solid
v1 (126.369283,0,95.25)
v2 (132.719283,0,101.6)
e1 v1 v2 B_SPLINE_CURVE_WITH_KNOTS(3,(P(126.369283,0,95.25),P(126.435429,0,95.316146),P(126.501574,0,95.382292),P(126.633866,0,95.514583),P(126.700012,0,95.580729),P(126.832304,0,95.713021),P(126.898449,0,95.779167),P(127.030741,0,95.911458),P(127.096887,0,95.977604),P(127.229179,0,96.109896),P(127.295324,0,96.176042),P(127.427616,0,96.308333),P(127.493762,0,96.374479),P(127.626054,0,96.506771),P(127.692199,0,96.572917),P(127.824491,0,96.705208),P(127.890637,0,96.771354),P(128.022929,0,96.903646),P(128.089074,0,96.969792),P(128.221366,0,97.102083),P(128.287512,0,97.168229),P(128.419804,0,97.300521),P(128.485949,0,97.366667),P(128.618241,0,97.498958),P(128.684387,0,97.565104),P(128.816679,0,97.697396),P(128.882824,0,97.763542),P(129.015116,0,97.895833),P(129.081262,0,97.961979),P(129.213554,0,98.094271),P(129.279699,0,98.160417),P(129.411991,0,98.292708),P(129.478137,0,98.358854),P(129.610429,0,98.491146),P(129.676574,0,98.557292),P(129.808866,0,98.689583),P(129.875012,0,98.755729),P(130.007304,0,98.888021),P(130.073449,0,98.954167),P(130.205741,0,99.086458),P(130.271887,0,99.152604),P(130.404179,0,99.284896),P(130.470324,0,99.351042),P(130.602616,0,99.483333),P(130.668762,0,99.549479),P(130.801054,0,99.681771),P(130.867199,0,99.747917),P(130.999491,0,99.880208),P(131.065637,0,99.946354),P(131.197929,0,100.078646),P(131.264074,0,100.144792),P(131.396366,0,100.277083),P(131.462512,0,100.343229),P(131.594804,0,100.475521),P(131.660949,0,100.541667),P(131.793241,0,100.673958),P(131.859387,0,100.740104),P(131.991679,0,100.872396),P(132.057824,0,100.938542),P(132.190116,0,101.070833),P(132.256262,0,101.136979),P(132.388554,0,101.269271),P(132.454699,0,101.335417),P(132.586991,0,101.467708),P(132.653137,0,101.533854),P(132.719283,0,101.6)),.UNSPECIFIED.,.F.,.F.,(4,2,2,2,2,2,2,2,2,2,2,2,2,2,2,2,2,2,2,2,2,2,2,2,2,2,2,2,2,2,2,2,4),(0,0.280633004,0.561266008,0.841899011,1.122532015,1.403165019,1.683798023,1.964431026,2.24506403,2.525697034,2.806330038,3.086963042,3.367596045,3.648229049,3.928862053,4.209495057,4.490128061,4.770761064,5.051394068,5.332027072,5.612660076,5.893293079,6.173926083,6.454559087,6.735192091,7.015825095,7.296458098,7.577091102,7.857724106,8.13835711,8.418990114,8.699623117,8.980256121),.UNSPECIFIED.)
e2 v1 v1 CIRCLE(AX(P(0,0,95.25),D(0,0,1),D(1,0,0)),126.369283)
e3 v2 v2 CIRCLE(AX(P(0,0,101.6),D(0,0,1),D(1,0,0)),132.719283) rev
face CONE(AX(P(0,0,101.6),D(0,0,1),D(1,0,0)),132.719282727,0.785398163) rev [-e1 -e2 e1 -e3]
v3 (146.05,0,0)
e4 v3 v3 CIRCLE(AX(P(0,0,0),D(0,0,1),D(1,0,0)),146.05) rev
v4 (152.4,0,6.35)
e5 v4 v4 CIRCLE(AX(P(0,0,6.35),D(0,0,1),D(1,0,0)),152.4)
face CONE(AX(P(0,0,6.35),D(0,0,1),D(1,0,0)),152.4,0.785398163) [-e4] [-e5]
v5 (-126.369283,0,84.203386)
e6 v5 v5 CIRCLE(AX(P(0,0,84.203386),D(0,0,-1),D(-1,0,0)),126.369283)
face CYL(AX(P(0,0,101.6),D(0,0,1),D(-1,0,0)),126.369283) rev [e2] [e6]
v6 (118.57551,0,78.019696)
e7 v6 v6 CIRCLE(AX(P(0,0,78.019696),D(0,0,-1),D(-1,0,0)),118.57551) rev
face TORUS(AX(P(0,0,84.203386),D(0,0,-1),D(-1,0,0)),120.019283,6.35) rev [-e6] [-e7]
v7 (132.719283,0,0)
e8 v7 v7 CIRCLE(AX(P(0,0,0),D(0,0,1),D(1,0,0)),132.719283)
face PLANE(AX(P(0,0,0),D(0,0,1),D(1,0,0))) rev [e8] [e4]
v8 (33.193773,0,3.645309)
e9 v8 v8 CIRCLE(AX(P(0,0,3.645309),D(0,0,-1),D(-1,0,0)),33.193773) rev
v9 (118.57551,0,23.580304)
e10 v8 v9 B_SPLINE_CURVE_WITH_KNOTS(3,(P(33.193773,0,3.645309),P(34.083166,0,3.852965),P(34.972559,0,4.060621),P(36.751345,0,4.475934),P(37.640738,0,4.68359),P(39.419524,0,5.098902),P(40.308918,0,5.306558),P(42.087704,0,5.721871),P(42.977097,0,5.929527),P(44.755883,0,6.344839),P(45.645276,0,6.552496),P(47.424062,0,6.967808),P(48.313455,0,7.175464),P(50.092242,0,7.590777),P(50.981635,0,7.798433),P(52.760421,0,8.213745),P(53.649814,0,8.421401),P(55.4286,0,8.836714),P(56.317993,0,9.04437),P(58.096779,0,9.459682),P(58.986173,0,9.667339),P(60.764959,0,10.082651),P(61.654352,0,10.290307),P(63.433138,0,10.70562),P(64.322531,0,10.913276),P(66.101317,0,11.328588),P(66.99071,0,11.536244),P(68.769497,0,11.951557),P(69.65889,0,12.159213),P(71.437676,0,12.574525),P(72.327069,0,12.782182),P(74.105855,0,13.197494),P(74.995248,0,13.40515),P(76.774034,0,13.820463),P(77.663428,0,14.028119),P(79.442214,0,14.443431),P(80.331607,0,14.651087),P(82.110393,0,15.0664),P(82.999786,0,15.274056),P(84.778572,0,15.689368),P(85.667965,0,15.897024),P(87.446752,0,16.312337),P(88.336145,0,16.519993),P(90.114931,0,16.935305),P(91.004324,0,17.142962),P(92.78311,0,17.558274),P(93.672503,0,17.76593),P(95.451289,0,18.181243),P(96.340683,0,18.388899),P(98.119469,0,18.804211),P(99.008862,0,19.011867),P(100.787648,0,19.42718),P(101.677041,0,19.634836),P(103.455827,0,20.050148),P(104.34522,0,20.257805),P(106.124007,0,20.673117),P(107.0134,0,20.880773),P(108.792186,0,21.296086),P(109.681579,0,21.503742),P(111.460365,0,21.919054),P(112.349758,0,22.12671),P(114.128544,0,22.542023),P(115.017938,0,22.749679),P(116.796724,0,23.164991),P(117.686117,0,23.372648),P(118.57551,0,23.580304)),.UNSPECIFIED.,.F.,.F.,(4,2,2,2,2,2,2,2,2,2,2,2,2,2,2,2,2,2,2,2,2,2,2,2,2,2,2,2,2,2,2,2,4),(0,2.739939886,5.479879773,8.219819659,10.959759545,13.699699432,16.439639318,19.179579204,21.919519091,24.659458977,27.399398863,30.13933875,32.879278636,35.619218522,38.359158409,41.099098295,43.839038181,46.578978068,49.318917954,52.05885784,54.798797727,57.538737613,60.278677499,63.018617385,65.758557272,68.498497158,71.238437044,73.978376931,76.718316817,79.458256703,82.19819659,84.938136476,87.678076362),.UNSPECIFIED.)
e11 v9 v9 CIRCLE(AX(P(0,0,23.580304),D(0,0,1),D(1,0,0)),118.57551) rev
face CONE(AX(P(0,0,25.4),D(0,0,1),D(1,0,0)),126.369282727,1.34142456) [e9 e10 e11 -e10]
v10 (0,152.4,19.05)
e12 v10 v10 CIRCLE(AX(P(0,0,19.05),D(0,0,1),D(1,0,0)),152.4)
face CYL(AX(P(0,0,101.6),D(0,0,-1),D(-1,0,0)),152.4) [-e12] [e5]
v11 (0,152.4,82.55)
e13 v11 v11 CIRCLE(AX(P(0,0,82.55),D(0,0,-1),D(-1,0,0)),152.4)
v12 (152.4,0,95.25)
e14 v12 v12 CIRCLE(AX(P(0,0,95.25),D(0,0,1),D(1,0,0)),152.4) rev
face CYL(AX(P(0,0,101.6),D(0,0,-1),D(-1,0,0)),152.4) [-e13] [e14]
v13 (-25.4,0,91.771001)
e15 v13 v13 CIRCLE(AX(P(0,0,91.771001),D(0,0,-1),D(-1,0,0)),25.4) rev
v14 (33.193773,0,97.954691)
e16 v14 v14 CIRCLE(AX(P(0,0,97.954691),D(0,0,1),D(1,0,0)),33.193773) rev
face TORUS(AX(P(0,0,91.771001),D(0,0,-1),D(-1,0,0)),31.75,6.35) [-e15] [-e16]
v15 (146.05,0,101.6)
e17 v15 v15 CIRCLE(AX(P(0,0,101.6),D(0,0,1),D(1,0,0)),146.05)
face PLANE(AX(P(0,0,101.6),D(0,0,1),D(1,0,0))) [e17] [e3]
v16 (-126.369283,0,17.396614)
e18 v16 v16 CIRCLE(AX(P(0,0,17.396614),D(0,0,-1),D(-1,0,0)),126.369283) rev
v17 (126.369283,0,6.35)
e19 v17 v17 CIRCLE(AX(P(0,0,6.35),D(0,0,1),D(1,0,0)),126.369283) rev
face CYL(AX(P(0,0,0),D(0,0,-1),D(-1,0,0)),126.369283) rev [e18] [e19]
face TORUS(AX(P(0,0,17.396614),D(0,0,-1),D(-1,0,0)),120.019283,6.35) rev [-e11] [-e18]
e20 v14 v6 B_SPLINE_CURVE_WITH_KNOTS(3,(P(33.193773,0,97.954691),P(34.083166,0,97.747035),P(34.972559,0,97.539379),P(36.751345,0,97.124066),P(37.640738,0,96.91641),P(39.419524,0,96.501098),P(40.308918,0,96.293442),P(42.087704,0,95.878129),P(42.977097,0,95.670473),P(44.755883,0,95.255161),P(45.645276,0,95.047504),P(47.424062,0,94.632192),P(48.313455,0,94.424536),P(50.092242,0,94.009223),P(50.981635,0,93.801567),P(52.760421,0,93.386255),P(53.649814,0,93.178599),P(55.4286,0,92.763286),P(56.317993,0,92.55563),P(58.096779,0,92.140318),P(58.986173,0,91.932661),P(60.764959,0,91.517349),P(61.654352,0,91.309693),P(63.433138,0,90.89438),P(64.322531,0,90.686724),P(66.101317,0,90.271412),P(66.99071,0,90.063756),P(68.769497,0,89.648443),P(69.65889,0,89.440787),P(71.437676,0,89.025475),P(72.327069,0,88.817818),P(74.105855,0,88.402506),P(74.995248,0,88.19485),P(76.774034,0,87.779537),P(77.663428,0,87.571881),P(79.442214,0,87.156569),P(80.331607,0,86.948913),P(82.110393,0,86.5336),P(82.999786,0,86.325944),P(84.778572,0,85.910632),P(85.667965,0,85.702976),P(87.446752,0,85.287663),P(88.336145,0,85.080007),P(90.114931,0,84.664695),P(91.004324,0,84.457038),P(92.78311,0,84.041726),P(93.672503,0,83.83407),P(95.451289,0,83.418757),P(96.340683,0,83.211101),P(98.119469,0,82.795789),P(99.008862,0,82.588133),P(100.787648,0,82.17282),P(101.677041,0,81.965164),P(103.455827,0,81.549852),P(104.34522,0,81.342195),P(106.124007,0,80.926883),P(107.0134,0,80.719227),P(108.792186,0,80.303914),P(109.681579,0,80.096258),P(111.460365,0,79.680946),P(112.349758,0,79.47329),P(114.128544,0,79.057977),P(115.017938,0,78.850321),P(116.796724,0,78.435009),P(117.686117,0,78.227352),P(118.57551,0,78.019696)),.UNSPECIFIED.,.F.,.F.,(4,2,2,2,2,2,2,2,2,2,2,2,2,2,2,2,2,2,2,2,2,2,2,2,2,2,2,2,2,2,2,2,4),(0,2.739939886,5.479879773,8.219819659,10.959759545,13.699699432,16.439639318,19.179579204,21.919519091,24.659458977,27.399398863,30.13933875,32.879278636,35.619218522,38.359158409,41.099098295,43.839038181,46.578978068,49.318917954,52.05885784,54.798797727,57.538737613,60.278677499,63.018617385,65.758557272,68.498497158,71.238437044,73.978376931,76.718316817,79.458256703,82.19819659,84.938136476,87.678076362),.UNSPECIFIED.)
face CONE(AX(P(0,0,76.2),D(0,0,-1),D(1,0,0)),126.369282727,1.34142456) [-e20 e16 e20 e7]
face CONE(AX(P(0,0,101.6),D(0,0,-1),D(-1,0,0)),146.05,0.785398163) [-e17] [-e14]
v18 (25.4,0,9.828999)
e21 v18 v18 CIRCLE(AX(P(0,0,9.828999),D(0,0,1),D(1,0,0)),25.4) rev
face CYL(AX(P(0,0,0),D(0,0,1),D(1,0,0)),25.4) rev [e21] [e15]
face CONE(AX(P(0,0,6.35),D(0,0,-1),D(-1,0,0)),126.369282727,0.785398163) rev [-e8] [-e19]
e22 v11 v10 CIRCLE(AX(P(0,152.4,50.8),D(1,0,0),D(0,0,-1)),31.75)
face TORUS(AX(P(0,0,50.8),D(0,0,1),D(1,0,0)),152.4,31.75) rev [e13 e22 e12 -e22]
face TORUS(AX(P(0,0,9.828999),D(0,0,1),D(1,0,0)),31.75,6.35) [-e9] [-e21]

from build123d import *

# Parameters (mm, degrees)
SKETCH1_R           = 152.4
BOSS_EXTRUDE1_DEPTH = 101.6
SKETCH2_R           = 31.75
SKETCH4_R           = 25.4
CUT_EXTRUDE1_DEPTH  = 239.273120599
CHAMFER1_SIZE       = 6.35
FILLET1_R           = 6.35
FILLET2_R           = 6.35
FILLET3_R           = 6.35


with BuildPart() as part:
    # Sketch1 → Boss-Extrude1 (new body)
    with BuildSketch(Plane.XY):
        Circle(SKETCH1_R)
    extrude(amount=BOSS_EXTRUDE1_DEPTH)

    # Cut-Sweep1: sweep along a path in Sketch3
    with BuildLine(Plane.XY.offset(50.8)) as cut_sweep1_path:
        CenterArc((0, 0), 152.4, 0, 360)
    # Sketch2 → Cut-Sweep1 (sweep, cut)
    with BuildSketch(Plane(origin=(0, 0, 0), x_dir=(0, 0, -1), z_dir=(1, 0, 0))):
        with Locations((-50.8, 152.4)):
            Circle(SKETCH2_R)
    sweep(path=cut_sweep1_path.line, mode=Mode.SUBTRACT)

    # Sketch4 → Cut-Extrude1 (cut, through all)
    with BuildSketch(Plane.XY.offset(101.6)):
        Circle(SKETCH4_R)
    extrude(amount=-CUT_EXTRUDE1_DEPTH, mode=Mode.SUBTRACT)

    # Sketch6 → Cut-Revolve5 (revolve, cut)
    with BuildSketch(Plane(origin=(0, 0, 0), x_dir=(0, 0, -1), z_dir=(1, 0, 0))):
        Polygon((-25.4, 126.369282727), (0, 126.369282727), (0, 17.580887087), align=None)
    cut_revolve5 = revolve(axis=Axis((0, 0, 0), (0, 0, 1)), mode=Mode.SUBTRACT)

    # Mirror1: Cut-Revolve5 across plane
    add(cut_revolve5.mirror(Plane.XY.offset(50.8)), mode=Mode.SUBTRACT)

    # Chamfer1
    chamfer1_edges = [part.edges().sort_by_distance(p)[0] for p in [
        (0, -126.369282727, 0),
        (-152.4, 0, 0),
        (0, -126.369282727, 101.6),
        (-152.4, 0, 101.6),
    ]]
    chamfer(chamfer1_edges, length=CHAMFER1_SIZE)

    # Fillet1
    fillet1_edges = [part.edges().sort_by_distance(p)[0] for p in [
        (0, -126.369282727, 76.2),
    ]]
    fillet(fillet1_edges, radius=FILLET1_R)

    # Fillet2
    fillet2_edges = [part.edges().sort_by_distance(p)[0] for p in [
        (0, -126.369282727, 25.4),
    ]]
    fillet(fillet2_edges, radius=FILLET2_R)

    # Fillet3
    # the kernel refuses this fillet: 6.35 mm, written as the material it takes off along each edge
    with BuildSketch(Plane(origin=(0, 0, 1.82561262), x_dir=(0, 1, 0), z_dir=(1, 0, 0))) as fillet3_piece_1:
        with BuildLine():
            CenterArc((25.4 + FILLET3_R, FILLET3_R * 1.26037575366), FILLET3_R, 180, 103.14203418)
            Line((25.4, FILLET3_R * 1.26037575366), (25.4, 0))
            Line((25.4, 0), (25.4 + FILLET3_R * 1.22736578908, FILLET3_R * 0.28656632777))
        make_face()
    fillet3_piece_1_solid = revolve(axis=Axis((0, 0, 1.82561262), (0, 0, 1)), revolution_arc=270, mode=Mode.PRIVATE)
    with BuildSketch(Plane(origin=(0, 0, 99.77438738), x_dir=(0, 1, 0), z_dir=(1, 0, 0))) as fillet3_piece_2:
        with BuildLine():
            CenterArc((25.4 + FILLET3_R, -FILLET3_R * 1.26037575366), FILLET3_R, 76.85796582, 103.14203418)
            Line((25.4 + FILLET3_R * 1.22736578908, -FILLET3_R * 0.28656632777), (25.4, 0))
            Line((25.4, 0), (25.4, -FILLET3_R * 1.26037575366))
        make_face()
    fillet3_piece_2_solid = revolve(axis=Axis((0, 0, 99.77438738), (0, 0, 1)), revolution_arc=270, mode=Mode.PRIVATE)
    with BuildSketch(Plane(origin=(0, 0, 99.77438738), x_dir=(1, 0, 0), z_dir=(0, -1, 0))) as fillet3_piece_3:
        with BuildLine():
            CenterArc((25.4 + FILLET3_R, -FILLET3_R * 1.26037575366), FILLET3_R, 76.85796582, 103.14203418)
            Line((25.4 + FILLET3_R * 1.22736578908, -FILLET3_R * 0.28656632777), (25.4, 0))
            Line((25.4, 0), (25.4, -FILLET3_R * 1.26037575366))
        make_face()
    fillet3_piece_3_solid = revolve(axis=Axis((0, 0, 99.77438738), (0, 0, 1)), revolution_arc=90, mode=Mode.PRIVATE)
    with BuildSketch(Plane(origin=(0, 0, 1.82561262), x_dir=(1, 0, 0), z_dir=(0, -1, 0))) as fillet3_piece_4:
        with BuildLine():
            CenterArc((25.4 + FILLET3_R, FILLET3_R * 1.26037575366), FILLET3_R, 180, 103.14203418)
            Line((25.4, FILLET3_R * 1.26037575366), (25.4, 0))
            Line((25.4, 0), (25.4 + FILLET3_R * 1.22736578908, FILLET3_R * 0.28656632777))
        make_face()
    fillet3_piece_4_solid = revolve(axis=Axis((0, 0, 1.82561262), (0, 0, 1)), revolution_arc=90, mode=Mode.PRIVATE)
    add([fillet3_piece_1_solid, fillet3_piece_2_solid, fillet3_piece_3_solid, fillet3_piece_4_solid], mode=Mode.SUBTRACT)


solid = part.part
